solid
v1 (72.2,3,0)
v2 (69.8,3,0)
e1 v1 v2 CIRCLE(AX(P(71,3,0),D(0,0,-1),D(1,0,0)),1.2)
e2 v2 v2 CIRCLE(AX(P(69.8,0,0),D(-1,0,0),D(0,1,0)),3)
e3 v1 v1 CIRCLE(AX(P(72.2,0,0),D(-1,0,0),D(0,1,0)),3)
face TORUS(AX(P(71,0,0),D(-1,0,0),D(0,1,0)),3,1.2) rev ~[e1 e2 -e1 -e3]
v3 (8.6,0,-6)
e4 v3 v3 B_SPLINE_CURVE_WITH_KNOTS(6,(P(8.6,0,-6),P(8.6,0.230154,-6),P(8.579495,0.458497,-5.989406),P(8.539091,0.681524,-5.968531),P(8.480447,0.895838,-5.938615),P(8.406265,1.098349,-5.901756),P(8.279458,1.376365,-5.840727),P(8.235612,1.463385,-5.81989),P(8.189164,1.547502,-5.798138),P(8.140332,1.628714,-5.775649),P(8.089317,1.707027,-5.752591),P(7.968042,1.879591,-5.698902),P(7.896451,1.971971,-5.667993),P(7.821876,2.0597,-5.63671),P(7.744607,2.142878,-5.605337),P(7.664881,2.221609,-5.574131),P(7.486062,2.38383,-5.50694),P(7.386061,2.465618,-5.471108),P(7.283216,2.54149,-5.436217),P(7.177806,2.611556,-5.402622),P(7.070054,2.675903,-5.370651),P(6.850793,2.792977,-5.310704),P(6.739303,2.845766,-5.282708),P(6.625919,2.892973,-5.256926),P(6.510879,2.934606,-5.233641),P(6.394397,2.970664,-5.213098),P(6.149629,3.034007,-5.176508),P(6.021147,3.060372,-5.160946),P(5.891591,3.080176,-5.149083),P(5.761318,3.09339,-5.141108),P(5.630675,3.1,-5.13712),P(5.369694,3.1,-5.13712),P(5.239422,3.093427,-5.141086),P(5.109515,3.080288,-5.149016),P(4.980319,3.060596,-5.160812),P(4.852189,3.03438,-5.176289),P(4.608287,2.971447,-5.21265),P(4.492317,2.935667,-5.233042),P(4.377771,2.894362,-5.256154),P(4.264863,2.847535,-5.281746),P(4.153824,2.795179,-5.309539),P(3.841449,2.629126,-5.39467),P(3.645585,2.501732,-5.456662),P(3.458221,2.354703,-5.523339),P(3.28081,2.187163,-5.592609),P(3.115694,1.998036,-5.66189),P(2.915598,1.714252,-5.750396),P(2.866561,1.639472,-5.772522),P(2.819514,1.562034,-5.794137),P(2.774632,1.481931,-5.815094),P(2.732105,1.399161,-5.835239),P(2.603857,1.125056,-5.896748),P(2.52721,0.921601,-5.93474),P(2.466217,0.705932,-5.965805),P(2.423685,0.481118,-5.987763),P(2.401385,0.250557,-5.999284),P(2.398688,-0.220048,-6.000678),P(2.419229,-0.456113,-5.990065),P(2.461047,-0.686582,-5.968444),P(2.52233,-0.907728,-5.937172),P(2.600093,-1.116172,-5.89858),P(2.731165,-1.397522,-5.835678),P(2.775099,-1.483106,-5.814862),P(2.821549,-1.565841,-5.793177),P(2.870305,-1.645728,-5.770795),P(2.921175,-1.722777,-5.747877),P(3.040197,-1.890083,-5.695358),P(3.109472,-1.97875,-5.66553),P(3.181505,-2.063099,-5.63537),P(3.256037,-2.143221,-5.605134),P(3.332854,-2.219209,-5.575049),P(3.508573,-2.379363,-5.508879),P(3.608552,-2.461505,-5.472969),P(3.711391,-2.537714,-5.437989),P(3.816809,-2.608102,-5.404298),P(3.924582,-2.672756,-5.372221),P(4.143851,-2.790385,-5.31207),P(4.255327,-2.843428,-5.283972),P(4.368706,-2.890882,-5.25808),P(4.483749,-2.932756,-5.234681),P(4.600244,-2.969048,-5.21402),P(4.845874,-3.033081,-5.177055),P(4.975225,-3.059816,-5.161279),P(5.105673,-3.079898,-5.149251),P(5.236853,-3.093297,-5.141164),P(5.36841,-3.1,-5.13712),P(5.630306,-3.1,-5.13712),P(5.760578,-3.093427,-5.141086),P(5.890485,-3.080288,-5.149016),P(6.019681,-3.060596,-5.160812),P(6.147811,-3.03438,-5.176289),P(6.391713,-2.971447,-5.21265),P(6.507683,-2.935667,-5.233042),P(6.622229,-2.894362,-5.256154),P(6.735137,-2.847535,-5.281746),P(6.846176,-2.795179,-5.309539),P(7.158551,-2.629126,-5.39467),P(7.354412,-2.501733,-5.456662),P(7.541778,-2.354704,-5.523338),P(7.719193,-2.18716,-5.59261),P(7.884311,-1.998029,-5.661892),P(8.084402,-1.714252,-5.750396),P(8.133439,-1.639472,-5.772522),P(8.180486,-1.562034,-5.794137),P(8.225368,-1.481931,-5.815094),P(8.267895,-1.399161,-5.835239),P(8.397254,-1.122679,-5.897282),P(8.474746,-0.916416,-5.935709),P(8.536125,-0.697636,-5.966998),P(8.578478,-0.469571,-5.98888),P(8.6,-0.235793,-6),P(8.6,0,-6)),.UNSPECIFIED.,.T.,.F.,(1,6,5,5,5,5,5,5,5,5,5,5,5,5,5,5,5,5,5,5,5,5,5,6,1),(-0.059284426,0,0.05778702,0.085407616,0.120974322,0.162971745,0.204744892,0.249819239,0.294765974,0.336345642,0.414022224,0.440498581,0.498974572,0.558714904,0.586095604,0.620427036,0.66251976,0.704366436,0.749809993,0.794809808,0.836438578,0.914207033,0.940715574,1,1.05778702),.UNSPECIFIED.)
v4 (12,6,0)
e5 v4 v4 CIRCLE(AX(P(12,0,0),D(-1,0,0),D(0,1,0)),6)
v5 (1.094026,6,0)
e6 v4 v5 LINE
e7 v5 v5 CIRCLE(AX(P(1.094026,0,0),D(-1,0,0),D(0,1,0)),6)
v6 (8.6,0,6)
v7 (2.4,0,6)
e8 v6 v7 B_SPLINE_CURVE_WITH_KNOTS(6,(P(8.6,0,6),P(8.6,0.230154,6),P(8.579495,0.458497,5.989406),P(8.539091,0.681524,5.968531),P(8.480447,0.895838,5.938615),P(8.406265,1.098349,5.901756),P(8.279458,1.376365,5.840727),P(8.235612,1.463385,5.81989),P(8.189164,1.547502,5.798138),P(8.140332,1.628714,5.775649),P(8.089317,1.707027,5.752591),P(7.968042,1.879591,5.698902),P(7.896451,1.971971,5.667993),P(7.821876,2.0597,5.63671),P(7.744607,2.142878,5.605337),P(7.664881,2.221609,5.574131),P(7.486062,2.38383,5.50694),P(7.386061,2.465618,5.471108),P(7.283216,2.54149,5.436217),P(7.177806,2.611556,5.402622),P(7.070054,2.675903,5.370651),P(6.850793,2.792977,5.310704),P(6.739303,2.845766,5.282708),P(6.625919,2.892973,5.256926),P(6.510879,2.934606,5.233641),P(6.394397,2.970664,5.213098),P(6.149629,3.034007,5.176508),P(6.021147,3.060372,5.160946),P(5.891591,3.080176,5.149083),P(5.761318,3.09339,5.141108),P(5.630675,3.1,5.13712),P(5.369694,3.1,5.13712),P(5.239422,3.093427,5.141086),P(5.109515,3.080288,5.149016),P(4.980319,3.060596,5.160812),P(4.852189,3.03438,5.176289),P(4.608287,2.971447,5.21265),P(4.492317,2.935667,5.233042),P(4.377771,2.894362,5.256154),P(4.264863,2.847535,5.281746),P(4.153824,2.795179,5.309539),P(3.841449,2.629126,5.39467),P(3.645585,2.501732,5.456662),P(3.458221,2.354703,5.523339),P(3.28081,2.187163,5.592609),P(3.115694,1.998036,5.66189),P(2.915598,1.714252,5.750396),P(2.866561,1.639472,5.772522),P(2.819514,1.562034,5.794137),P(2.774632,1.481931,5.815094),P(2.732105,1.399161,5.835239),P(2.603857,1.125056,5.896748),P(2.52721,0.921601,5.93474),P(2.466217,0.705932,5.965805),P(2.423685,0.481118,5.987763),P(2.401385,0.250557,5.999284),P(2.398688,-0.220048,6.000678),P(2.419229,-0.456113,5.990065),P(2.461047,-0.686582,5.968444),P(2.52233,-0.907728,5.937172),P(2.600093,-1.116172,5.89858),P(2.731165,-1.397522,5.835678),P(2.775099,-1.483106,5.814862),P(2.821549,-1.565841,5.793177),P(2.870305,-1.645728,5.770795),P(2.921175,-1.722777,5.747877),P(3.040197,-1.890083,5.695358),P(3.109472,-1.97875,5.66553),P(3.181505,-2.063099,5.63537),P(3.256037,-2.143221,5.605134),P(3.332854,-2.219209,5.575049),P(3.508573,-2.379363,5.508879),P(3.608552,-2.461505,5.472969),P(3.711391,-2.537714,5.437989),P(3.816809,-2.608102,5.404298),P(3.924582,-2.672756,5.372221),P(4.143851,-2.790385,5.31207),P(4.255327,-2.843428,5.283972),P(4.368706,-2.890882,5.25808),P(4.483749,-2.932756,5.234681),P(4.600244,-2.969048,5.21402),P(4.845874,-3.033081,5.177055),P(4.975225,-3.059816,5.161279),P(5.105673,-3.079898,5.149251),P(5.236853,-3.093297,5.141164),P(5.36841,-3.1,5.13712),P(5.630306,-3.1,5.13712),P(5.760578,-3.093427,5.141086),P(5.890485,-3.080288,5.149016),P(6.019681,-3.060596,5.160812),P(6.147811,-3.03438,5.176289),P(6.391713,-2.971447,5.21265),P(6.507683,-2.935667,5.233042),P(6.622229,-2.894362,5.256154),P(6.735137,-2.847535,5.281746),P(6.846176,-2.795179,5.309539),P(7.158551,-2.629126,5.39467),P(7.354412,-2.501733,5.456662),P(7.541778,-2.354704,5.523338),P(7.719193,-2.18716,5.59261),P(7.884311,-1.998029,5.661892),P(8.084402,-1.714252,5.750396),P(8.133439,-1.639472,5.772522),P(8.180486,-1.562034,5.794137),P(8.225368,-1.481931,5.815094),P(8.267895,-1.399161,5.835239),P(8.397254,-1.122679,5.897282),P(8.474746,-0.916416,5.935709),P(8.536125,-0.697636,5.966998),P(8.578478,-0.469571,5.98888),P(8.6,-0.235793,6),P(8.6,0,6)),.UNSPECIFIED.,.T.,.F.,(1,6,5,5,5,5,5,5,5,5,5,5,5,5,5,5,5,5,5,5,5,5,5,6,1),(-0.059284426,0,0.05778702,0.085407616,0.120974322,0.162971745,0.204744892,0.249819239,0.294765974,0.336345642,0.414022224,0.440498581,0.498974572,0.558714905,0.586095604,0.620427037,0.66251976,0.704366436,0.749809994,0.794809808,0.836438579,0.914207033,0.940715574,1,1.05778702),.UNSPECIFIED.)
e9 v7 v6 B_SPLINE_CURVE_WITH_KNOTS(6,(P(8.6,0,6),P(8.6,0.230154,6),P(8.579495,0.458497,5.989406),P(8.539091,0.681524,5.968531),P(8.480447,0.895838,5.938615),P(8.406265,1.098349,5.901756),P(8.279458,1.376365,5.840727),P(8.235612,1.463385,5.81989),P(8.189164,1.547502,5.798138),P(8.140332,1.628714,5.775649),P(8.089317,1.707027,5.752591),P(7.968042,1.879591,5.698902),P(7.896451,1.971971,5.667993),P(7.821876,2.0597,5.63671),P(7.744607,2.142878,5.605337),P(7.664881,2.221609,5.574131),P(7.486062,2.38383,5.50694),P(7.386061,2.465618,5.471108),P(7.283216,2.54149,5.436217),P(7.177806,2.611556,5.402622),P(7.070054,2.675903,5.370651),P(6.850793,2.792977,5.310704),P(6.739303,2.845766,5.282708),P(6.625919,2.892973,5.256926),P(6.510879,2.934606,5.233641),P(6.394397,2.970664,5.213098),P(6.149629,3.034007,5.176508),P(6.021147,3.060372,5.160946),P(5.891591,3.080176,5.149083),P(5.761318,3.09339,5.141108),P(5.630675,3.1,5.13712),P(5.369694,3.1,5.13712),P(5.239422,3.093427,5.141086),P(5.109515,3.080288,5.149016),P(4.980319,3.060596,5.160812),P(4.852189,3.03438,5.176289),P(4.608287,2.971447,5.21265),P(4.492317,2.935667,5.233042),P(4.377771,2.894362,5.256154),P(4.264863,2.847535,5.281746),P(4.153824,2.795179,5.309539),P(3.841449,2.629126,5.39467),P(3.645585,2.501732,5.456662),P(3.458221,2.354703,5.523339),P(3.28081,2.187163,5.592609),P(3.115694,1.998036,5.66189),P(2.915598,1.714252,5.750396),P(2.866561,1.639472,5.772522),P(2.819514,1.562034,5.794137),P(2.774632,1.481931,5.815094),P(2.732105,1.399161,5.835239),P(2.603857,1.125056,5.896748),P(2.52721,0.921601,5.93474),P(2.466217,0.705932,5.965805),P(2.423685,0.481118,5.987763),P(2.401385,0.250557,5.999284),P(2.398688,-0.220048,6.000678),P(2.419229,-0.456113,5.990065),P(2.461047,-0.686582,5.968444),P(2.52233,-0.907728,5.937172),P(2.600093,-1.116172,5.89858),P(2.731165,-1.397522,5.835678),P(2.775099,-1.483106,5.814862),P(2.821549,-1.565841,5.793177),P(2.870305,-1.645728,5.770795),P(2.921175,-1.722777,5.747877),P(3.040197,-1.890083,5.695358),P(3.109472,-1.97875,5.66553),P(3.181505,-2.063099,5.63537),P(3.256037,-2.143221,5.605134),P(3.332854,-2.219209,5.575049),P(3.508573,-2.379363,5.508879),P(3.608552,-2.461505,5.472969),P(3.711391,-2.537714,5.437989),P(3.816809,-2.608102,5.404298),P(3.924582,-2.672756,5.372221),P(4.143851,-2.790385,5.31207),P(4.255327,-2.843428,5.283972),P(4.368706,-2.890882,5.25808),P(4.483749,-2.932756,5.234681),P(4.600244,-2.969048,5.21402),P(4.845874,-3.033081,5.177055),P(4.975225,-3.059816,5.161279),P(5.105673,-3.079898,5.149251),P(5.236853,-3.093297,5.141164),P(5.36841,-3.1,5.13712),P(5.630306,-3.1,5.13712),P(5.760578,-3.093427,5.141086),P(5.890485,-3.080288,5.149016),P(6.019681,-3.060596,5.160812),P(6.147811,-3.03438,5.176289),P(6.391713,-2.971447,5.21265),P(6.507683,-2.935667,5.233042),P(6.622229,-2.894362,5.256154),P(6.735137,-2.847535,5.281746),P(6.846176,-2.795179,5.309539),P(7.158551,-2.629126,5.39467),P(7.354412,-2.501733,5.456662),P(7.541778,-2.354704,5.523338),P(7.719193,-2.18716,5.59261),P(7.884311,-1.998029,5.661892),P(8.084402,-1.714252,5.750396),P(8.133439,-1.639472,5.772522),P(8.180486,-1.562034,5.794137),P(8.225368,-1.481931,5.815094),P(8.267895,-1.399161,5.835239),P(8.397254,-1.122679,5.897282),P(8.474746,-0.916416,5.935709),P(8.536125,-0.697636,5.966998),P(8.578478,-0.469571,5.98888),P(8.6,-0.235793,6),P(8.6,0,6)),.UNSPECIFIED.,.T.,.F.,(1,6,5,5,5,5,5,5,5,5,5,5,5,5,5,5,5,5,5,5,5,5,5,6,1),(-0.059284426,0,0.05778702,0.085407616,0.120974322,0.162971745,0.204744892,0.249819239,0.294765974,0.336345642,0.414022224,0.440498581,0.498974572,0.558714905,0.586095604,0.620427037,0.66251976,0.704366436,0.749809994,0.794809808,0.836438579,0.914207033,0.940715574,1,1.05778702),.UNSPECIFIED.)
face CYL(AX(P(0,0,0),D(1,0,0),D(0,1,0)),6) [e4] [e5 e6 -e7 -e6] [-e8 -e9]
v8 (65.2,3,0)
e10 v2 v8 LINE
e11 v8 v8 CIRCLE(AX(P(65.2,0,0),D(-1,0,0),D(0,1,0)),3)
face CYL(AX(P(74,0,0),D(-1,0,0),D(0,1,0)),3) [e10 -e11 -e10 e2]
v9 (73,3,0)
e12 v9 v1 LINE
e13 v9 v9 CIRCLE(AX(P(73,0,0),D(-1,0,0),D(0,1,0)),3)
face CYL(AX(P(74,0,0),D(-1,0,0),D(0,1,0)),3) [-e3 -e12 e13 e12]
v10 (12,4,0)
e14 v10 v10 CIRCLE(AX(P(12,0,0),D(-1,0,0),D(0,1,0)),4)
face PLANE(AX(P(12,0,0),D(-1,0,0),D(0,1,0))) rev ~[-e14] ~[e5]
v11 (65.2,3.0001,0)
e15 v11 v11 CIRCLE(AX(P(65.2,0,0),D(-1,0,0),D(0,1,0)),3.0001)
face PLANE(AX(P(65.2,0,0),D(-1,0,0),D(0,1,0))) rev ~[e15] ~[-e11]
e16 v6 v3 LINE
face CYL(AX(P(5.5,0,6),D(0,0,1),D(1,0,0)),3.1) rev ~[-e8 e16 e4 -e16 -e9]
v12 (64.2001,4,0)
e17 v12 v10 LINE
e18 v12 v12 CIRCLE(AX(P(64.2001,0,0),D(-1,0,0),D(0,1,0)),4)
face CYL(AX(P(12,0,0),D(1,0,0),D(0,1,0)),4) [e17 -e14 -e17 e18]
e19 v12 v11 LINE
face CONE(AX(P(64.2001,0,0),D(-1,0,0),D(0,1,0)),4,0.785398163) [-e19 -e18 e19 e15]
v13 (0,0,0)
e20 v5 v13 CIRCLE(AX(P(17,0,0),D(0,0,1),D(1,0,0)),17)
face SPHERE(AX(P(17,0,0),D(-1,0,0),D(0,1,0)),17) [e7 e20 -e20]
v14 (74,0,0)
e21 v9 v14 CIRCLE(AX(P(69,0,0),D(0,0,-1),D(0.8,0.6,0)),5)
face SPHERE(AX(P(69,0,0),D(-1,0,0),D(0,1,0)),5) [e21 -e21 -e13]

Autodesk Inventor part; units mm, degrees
ref_plane "YZ Plane" through (0, 0, 0) normal (1, 0, 0) x (0, 1, 0)
ref_plane "XZ Plane" through (0, 0, 0) normal (0, 1, 0) x (-1, 0, 0)
sketch "Sketch1" plane through (0, 0, 0) normal (0, 0, 1) x (1, 0, 0)
  line L0 (0, 0) -> (74, 0)
  line L1 (0, 0) -> (17, 0)
  circle A0 centre (17, 0) radius 17
  line L2 (0, 0) -> (0, 12)
  line L3 (74, 0) -> (69, 0)
  circle A1 centre (69, 0) radius 5
  line L4 (74, 0) -> (74, 3)
  line L5 (74, 3) -> (65.2, 3)
  line L6 (65.2, 3) -> (65.2, 0)
  line L7 (65.2, 0) -> (74, 0)
  line L8 (74, 0) -> (74, 3)
  line L9 (74, 3) -> (69.8, 3)
  line L10 (69.8, 3) -> (69.8, 3)
  line L11 (69.8, 0) -> (74, 0)
  line L12 (74, 0) -> (74, 3)
  line L13 (74, 0) -> (69.8, 0)
  line L14 (69.8, 0) -> (69.8, 1.8)
  line L15 (71, 1.8) -> (74, 1.8)
  line L16 (74, 1.8) -> (74, 0)
  arc A2 (69.8, 3) -> (71, 1.8) centre (71, 3) ccw
  line L17 (71, 1.8) -> (71, 1.8)
  line L18 (72.2, 3) -> (72.2, 3)
  arc A3 (71, 1.8) -> (72.2, 3) centre (71, 3) ccw
  line L19 (65.2, 0) -> (12, 0)
  line L20 (12, 0) -> (12, 4)
  line L21 (12, 4) -> (65.2, 4)
  line L22 (65.2, 4) -> (65.2, 0)
  line L23 (12, 0) -> (0, 0)
  line L24 (0, 0) -> (0, 6)
  line L25 (0, 6) -> (12, 6)
  line L26 (12, 6) -> (12, 0)
  line L27 (12, 6) -> (5.5, 6)
  line L28 (5.5, 6) -> (5.5, 0)
  point P0 (72.2, 1.8)
  point P1 (1.094, 6)
  point P2 (73, 3)
  dimension "d0" = 74
  dimension "d1" = 17
  dimension "d2" = 12
  dimension "d3" = 5
  dimension "d4" = 3
  dimension "d5" = 8.8
  dimension "d6" = 4.2
  dimension "d7" = 1.8
  dimension "d8" = 1.2
  dimension "d9" = 1.2
  dimension "d10" = 1.2
  dimension "d11" = 53.2
  dimension "d12" = 4
  dimension "d13" = 6
  dimension "d14" = 6.5
revolve "Revolution1" add sketch "Sketch1" angle 360 about axis through (65.2, 0, 0) along (-1, 0, 0) contours A0 L25 L28 L0 | L28 L25 L26 L20 L0 | A0 L21 L22 A1 L0 | L0 L20 L21 A0 | A1 L22 L6 L0 | L6 L5 A2 L15 A1 L0 | A1 L15 A3 L5
chamfer "Chamfer1" distance 1 angle 45 1 edges at (65.2, -4, 0)
ref_plane "Work Plane1" through (6.547, 0, 6) normal (0, 0, 1) x (1, 0, 0)
sketch "Sketch2" plane through (6.547, 0, 6) normal (0, 0, 1) x (1, 0, 0)
  line L0 (5.453, 4) -> (5.453, -4) projected
  line L1 (5.453, 0) -> (-1.047, 0)
  circle A0 centre (-1.047, 0) radius 3.1
  point P0 (-6.547, 0)
  dimension "d19" = 6.5
  dimension "d20" = 6.2
extrude "Extrusion1" cut sketch "Sketch2" against normal through all
thread "Thread1" size "M8x1.25" class "6g" standard "ANSI Metric M Profile" length 49.2
properties part number "Menetesorsó"
